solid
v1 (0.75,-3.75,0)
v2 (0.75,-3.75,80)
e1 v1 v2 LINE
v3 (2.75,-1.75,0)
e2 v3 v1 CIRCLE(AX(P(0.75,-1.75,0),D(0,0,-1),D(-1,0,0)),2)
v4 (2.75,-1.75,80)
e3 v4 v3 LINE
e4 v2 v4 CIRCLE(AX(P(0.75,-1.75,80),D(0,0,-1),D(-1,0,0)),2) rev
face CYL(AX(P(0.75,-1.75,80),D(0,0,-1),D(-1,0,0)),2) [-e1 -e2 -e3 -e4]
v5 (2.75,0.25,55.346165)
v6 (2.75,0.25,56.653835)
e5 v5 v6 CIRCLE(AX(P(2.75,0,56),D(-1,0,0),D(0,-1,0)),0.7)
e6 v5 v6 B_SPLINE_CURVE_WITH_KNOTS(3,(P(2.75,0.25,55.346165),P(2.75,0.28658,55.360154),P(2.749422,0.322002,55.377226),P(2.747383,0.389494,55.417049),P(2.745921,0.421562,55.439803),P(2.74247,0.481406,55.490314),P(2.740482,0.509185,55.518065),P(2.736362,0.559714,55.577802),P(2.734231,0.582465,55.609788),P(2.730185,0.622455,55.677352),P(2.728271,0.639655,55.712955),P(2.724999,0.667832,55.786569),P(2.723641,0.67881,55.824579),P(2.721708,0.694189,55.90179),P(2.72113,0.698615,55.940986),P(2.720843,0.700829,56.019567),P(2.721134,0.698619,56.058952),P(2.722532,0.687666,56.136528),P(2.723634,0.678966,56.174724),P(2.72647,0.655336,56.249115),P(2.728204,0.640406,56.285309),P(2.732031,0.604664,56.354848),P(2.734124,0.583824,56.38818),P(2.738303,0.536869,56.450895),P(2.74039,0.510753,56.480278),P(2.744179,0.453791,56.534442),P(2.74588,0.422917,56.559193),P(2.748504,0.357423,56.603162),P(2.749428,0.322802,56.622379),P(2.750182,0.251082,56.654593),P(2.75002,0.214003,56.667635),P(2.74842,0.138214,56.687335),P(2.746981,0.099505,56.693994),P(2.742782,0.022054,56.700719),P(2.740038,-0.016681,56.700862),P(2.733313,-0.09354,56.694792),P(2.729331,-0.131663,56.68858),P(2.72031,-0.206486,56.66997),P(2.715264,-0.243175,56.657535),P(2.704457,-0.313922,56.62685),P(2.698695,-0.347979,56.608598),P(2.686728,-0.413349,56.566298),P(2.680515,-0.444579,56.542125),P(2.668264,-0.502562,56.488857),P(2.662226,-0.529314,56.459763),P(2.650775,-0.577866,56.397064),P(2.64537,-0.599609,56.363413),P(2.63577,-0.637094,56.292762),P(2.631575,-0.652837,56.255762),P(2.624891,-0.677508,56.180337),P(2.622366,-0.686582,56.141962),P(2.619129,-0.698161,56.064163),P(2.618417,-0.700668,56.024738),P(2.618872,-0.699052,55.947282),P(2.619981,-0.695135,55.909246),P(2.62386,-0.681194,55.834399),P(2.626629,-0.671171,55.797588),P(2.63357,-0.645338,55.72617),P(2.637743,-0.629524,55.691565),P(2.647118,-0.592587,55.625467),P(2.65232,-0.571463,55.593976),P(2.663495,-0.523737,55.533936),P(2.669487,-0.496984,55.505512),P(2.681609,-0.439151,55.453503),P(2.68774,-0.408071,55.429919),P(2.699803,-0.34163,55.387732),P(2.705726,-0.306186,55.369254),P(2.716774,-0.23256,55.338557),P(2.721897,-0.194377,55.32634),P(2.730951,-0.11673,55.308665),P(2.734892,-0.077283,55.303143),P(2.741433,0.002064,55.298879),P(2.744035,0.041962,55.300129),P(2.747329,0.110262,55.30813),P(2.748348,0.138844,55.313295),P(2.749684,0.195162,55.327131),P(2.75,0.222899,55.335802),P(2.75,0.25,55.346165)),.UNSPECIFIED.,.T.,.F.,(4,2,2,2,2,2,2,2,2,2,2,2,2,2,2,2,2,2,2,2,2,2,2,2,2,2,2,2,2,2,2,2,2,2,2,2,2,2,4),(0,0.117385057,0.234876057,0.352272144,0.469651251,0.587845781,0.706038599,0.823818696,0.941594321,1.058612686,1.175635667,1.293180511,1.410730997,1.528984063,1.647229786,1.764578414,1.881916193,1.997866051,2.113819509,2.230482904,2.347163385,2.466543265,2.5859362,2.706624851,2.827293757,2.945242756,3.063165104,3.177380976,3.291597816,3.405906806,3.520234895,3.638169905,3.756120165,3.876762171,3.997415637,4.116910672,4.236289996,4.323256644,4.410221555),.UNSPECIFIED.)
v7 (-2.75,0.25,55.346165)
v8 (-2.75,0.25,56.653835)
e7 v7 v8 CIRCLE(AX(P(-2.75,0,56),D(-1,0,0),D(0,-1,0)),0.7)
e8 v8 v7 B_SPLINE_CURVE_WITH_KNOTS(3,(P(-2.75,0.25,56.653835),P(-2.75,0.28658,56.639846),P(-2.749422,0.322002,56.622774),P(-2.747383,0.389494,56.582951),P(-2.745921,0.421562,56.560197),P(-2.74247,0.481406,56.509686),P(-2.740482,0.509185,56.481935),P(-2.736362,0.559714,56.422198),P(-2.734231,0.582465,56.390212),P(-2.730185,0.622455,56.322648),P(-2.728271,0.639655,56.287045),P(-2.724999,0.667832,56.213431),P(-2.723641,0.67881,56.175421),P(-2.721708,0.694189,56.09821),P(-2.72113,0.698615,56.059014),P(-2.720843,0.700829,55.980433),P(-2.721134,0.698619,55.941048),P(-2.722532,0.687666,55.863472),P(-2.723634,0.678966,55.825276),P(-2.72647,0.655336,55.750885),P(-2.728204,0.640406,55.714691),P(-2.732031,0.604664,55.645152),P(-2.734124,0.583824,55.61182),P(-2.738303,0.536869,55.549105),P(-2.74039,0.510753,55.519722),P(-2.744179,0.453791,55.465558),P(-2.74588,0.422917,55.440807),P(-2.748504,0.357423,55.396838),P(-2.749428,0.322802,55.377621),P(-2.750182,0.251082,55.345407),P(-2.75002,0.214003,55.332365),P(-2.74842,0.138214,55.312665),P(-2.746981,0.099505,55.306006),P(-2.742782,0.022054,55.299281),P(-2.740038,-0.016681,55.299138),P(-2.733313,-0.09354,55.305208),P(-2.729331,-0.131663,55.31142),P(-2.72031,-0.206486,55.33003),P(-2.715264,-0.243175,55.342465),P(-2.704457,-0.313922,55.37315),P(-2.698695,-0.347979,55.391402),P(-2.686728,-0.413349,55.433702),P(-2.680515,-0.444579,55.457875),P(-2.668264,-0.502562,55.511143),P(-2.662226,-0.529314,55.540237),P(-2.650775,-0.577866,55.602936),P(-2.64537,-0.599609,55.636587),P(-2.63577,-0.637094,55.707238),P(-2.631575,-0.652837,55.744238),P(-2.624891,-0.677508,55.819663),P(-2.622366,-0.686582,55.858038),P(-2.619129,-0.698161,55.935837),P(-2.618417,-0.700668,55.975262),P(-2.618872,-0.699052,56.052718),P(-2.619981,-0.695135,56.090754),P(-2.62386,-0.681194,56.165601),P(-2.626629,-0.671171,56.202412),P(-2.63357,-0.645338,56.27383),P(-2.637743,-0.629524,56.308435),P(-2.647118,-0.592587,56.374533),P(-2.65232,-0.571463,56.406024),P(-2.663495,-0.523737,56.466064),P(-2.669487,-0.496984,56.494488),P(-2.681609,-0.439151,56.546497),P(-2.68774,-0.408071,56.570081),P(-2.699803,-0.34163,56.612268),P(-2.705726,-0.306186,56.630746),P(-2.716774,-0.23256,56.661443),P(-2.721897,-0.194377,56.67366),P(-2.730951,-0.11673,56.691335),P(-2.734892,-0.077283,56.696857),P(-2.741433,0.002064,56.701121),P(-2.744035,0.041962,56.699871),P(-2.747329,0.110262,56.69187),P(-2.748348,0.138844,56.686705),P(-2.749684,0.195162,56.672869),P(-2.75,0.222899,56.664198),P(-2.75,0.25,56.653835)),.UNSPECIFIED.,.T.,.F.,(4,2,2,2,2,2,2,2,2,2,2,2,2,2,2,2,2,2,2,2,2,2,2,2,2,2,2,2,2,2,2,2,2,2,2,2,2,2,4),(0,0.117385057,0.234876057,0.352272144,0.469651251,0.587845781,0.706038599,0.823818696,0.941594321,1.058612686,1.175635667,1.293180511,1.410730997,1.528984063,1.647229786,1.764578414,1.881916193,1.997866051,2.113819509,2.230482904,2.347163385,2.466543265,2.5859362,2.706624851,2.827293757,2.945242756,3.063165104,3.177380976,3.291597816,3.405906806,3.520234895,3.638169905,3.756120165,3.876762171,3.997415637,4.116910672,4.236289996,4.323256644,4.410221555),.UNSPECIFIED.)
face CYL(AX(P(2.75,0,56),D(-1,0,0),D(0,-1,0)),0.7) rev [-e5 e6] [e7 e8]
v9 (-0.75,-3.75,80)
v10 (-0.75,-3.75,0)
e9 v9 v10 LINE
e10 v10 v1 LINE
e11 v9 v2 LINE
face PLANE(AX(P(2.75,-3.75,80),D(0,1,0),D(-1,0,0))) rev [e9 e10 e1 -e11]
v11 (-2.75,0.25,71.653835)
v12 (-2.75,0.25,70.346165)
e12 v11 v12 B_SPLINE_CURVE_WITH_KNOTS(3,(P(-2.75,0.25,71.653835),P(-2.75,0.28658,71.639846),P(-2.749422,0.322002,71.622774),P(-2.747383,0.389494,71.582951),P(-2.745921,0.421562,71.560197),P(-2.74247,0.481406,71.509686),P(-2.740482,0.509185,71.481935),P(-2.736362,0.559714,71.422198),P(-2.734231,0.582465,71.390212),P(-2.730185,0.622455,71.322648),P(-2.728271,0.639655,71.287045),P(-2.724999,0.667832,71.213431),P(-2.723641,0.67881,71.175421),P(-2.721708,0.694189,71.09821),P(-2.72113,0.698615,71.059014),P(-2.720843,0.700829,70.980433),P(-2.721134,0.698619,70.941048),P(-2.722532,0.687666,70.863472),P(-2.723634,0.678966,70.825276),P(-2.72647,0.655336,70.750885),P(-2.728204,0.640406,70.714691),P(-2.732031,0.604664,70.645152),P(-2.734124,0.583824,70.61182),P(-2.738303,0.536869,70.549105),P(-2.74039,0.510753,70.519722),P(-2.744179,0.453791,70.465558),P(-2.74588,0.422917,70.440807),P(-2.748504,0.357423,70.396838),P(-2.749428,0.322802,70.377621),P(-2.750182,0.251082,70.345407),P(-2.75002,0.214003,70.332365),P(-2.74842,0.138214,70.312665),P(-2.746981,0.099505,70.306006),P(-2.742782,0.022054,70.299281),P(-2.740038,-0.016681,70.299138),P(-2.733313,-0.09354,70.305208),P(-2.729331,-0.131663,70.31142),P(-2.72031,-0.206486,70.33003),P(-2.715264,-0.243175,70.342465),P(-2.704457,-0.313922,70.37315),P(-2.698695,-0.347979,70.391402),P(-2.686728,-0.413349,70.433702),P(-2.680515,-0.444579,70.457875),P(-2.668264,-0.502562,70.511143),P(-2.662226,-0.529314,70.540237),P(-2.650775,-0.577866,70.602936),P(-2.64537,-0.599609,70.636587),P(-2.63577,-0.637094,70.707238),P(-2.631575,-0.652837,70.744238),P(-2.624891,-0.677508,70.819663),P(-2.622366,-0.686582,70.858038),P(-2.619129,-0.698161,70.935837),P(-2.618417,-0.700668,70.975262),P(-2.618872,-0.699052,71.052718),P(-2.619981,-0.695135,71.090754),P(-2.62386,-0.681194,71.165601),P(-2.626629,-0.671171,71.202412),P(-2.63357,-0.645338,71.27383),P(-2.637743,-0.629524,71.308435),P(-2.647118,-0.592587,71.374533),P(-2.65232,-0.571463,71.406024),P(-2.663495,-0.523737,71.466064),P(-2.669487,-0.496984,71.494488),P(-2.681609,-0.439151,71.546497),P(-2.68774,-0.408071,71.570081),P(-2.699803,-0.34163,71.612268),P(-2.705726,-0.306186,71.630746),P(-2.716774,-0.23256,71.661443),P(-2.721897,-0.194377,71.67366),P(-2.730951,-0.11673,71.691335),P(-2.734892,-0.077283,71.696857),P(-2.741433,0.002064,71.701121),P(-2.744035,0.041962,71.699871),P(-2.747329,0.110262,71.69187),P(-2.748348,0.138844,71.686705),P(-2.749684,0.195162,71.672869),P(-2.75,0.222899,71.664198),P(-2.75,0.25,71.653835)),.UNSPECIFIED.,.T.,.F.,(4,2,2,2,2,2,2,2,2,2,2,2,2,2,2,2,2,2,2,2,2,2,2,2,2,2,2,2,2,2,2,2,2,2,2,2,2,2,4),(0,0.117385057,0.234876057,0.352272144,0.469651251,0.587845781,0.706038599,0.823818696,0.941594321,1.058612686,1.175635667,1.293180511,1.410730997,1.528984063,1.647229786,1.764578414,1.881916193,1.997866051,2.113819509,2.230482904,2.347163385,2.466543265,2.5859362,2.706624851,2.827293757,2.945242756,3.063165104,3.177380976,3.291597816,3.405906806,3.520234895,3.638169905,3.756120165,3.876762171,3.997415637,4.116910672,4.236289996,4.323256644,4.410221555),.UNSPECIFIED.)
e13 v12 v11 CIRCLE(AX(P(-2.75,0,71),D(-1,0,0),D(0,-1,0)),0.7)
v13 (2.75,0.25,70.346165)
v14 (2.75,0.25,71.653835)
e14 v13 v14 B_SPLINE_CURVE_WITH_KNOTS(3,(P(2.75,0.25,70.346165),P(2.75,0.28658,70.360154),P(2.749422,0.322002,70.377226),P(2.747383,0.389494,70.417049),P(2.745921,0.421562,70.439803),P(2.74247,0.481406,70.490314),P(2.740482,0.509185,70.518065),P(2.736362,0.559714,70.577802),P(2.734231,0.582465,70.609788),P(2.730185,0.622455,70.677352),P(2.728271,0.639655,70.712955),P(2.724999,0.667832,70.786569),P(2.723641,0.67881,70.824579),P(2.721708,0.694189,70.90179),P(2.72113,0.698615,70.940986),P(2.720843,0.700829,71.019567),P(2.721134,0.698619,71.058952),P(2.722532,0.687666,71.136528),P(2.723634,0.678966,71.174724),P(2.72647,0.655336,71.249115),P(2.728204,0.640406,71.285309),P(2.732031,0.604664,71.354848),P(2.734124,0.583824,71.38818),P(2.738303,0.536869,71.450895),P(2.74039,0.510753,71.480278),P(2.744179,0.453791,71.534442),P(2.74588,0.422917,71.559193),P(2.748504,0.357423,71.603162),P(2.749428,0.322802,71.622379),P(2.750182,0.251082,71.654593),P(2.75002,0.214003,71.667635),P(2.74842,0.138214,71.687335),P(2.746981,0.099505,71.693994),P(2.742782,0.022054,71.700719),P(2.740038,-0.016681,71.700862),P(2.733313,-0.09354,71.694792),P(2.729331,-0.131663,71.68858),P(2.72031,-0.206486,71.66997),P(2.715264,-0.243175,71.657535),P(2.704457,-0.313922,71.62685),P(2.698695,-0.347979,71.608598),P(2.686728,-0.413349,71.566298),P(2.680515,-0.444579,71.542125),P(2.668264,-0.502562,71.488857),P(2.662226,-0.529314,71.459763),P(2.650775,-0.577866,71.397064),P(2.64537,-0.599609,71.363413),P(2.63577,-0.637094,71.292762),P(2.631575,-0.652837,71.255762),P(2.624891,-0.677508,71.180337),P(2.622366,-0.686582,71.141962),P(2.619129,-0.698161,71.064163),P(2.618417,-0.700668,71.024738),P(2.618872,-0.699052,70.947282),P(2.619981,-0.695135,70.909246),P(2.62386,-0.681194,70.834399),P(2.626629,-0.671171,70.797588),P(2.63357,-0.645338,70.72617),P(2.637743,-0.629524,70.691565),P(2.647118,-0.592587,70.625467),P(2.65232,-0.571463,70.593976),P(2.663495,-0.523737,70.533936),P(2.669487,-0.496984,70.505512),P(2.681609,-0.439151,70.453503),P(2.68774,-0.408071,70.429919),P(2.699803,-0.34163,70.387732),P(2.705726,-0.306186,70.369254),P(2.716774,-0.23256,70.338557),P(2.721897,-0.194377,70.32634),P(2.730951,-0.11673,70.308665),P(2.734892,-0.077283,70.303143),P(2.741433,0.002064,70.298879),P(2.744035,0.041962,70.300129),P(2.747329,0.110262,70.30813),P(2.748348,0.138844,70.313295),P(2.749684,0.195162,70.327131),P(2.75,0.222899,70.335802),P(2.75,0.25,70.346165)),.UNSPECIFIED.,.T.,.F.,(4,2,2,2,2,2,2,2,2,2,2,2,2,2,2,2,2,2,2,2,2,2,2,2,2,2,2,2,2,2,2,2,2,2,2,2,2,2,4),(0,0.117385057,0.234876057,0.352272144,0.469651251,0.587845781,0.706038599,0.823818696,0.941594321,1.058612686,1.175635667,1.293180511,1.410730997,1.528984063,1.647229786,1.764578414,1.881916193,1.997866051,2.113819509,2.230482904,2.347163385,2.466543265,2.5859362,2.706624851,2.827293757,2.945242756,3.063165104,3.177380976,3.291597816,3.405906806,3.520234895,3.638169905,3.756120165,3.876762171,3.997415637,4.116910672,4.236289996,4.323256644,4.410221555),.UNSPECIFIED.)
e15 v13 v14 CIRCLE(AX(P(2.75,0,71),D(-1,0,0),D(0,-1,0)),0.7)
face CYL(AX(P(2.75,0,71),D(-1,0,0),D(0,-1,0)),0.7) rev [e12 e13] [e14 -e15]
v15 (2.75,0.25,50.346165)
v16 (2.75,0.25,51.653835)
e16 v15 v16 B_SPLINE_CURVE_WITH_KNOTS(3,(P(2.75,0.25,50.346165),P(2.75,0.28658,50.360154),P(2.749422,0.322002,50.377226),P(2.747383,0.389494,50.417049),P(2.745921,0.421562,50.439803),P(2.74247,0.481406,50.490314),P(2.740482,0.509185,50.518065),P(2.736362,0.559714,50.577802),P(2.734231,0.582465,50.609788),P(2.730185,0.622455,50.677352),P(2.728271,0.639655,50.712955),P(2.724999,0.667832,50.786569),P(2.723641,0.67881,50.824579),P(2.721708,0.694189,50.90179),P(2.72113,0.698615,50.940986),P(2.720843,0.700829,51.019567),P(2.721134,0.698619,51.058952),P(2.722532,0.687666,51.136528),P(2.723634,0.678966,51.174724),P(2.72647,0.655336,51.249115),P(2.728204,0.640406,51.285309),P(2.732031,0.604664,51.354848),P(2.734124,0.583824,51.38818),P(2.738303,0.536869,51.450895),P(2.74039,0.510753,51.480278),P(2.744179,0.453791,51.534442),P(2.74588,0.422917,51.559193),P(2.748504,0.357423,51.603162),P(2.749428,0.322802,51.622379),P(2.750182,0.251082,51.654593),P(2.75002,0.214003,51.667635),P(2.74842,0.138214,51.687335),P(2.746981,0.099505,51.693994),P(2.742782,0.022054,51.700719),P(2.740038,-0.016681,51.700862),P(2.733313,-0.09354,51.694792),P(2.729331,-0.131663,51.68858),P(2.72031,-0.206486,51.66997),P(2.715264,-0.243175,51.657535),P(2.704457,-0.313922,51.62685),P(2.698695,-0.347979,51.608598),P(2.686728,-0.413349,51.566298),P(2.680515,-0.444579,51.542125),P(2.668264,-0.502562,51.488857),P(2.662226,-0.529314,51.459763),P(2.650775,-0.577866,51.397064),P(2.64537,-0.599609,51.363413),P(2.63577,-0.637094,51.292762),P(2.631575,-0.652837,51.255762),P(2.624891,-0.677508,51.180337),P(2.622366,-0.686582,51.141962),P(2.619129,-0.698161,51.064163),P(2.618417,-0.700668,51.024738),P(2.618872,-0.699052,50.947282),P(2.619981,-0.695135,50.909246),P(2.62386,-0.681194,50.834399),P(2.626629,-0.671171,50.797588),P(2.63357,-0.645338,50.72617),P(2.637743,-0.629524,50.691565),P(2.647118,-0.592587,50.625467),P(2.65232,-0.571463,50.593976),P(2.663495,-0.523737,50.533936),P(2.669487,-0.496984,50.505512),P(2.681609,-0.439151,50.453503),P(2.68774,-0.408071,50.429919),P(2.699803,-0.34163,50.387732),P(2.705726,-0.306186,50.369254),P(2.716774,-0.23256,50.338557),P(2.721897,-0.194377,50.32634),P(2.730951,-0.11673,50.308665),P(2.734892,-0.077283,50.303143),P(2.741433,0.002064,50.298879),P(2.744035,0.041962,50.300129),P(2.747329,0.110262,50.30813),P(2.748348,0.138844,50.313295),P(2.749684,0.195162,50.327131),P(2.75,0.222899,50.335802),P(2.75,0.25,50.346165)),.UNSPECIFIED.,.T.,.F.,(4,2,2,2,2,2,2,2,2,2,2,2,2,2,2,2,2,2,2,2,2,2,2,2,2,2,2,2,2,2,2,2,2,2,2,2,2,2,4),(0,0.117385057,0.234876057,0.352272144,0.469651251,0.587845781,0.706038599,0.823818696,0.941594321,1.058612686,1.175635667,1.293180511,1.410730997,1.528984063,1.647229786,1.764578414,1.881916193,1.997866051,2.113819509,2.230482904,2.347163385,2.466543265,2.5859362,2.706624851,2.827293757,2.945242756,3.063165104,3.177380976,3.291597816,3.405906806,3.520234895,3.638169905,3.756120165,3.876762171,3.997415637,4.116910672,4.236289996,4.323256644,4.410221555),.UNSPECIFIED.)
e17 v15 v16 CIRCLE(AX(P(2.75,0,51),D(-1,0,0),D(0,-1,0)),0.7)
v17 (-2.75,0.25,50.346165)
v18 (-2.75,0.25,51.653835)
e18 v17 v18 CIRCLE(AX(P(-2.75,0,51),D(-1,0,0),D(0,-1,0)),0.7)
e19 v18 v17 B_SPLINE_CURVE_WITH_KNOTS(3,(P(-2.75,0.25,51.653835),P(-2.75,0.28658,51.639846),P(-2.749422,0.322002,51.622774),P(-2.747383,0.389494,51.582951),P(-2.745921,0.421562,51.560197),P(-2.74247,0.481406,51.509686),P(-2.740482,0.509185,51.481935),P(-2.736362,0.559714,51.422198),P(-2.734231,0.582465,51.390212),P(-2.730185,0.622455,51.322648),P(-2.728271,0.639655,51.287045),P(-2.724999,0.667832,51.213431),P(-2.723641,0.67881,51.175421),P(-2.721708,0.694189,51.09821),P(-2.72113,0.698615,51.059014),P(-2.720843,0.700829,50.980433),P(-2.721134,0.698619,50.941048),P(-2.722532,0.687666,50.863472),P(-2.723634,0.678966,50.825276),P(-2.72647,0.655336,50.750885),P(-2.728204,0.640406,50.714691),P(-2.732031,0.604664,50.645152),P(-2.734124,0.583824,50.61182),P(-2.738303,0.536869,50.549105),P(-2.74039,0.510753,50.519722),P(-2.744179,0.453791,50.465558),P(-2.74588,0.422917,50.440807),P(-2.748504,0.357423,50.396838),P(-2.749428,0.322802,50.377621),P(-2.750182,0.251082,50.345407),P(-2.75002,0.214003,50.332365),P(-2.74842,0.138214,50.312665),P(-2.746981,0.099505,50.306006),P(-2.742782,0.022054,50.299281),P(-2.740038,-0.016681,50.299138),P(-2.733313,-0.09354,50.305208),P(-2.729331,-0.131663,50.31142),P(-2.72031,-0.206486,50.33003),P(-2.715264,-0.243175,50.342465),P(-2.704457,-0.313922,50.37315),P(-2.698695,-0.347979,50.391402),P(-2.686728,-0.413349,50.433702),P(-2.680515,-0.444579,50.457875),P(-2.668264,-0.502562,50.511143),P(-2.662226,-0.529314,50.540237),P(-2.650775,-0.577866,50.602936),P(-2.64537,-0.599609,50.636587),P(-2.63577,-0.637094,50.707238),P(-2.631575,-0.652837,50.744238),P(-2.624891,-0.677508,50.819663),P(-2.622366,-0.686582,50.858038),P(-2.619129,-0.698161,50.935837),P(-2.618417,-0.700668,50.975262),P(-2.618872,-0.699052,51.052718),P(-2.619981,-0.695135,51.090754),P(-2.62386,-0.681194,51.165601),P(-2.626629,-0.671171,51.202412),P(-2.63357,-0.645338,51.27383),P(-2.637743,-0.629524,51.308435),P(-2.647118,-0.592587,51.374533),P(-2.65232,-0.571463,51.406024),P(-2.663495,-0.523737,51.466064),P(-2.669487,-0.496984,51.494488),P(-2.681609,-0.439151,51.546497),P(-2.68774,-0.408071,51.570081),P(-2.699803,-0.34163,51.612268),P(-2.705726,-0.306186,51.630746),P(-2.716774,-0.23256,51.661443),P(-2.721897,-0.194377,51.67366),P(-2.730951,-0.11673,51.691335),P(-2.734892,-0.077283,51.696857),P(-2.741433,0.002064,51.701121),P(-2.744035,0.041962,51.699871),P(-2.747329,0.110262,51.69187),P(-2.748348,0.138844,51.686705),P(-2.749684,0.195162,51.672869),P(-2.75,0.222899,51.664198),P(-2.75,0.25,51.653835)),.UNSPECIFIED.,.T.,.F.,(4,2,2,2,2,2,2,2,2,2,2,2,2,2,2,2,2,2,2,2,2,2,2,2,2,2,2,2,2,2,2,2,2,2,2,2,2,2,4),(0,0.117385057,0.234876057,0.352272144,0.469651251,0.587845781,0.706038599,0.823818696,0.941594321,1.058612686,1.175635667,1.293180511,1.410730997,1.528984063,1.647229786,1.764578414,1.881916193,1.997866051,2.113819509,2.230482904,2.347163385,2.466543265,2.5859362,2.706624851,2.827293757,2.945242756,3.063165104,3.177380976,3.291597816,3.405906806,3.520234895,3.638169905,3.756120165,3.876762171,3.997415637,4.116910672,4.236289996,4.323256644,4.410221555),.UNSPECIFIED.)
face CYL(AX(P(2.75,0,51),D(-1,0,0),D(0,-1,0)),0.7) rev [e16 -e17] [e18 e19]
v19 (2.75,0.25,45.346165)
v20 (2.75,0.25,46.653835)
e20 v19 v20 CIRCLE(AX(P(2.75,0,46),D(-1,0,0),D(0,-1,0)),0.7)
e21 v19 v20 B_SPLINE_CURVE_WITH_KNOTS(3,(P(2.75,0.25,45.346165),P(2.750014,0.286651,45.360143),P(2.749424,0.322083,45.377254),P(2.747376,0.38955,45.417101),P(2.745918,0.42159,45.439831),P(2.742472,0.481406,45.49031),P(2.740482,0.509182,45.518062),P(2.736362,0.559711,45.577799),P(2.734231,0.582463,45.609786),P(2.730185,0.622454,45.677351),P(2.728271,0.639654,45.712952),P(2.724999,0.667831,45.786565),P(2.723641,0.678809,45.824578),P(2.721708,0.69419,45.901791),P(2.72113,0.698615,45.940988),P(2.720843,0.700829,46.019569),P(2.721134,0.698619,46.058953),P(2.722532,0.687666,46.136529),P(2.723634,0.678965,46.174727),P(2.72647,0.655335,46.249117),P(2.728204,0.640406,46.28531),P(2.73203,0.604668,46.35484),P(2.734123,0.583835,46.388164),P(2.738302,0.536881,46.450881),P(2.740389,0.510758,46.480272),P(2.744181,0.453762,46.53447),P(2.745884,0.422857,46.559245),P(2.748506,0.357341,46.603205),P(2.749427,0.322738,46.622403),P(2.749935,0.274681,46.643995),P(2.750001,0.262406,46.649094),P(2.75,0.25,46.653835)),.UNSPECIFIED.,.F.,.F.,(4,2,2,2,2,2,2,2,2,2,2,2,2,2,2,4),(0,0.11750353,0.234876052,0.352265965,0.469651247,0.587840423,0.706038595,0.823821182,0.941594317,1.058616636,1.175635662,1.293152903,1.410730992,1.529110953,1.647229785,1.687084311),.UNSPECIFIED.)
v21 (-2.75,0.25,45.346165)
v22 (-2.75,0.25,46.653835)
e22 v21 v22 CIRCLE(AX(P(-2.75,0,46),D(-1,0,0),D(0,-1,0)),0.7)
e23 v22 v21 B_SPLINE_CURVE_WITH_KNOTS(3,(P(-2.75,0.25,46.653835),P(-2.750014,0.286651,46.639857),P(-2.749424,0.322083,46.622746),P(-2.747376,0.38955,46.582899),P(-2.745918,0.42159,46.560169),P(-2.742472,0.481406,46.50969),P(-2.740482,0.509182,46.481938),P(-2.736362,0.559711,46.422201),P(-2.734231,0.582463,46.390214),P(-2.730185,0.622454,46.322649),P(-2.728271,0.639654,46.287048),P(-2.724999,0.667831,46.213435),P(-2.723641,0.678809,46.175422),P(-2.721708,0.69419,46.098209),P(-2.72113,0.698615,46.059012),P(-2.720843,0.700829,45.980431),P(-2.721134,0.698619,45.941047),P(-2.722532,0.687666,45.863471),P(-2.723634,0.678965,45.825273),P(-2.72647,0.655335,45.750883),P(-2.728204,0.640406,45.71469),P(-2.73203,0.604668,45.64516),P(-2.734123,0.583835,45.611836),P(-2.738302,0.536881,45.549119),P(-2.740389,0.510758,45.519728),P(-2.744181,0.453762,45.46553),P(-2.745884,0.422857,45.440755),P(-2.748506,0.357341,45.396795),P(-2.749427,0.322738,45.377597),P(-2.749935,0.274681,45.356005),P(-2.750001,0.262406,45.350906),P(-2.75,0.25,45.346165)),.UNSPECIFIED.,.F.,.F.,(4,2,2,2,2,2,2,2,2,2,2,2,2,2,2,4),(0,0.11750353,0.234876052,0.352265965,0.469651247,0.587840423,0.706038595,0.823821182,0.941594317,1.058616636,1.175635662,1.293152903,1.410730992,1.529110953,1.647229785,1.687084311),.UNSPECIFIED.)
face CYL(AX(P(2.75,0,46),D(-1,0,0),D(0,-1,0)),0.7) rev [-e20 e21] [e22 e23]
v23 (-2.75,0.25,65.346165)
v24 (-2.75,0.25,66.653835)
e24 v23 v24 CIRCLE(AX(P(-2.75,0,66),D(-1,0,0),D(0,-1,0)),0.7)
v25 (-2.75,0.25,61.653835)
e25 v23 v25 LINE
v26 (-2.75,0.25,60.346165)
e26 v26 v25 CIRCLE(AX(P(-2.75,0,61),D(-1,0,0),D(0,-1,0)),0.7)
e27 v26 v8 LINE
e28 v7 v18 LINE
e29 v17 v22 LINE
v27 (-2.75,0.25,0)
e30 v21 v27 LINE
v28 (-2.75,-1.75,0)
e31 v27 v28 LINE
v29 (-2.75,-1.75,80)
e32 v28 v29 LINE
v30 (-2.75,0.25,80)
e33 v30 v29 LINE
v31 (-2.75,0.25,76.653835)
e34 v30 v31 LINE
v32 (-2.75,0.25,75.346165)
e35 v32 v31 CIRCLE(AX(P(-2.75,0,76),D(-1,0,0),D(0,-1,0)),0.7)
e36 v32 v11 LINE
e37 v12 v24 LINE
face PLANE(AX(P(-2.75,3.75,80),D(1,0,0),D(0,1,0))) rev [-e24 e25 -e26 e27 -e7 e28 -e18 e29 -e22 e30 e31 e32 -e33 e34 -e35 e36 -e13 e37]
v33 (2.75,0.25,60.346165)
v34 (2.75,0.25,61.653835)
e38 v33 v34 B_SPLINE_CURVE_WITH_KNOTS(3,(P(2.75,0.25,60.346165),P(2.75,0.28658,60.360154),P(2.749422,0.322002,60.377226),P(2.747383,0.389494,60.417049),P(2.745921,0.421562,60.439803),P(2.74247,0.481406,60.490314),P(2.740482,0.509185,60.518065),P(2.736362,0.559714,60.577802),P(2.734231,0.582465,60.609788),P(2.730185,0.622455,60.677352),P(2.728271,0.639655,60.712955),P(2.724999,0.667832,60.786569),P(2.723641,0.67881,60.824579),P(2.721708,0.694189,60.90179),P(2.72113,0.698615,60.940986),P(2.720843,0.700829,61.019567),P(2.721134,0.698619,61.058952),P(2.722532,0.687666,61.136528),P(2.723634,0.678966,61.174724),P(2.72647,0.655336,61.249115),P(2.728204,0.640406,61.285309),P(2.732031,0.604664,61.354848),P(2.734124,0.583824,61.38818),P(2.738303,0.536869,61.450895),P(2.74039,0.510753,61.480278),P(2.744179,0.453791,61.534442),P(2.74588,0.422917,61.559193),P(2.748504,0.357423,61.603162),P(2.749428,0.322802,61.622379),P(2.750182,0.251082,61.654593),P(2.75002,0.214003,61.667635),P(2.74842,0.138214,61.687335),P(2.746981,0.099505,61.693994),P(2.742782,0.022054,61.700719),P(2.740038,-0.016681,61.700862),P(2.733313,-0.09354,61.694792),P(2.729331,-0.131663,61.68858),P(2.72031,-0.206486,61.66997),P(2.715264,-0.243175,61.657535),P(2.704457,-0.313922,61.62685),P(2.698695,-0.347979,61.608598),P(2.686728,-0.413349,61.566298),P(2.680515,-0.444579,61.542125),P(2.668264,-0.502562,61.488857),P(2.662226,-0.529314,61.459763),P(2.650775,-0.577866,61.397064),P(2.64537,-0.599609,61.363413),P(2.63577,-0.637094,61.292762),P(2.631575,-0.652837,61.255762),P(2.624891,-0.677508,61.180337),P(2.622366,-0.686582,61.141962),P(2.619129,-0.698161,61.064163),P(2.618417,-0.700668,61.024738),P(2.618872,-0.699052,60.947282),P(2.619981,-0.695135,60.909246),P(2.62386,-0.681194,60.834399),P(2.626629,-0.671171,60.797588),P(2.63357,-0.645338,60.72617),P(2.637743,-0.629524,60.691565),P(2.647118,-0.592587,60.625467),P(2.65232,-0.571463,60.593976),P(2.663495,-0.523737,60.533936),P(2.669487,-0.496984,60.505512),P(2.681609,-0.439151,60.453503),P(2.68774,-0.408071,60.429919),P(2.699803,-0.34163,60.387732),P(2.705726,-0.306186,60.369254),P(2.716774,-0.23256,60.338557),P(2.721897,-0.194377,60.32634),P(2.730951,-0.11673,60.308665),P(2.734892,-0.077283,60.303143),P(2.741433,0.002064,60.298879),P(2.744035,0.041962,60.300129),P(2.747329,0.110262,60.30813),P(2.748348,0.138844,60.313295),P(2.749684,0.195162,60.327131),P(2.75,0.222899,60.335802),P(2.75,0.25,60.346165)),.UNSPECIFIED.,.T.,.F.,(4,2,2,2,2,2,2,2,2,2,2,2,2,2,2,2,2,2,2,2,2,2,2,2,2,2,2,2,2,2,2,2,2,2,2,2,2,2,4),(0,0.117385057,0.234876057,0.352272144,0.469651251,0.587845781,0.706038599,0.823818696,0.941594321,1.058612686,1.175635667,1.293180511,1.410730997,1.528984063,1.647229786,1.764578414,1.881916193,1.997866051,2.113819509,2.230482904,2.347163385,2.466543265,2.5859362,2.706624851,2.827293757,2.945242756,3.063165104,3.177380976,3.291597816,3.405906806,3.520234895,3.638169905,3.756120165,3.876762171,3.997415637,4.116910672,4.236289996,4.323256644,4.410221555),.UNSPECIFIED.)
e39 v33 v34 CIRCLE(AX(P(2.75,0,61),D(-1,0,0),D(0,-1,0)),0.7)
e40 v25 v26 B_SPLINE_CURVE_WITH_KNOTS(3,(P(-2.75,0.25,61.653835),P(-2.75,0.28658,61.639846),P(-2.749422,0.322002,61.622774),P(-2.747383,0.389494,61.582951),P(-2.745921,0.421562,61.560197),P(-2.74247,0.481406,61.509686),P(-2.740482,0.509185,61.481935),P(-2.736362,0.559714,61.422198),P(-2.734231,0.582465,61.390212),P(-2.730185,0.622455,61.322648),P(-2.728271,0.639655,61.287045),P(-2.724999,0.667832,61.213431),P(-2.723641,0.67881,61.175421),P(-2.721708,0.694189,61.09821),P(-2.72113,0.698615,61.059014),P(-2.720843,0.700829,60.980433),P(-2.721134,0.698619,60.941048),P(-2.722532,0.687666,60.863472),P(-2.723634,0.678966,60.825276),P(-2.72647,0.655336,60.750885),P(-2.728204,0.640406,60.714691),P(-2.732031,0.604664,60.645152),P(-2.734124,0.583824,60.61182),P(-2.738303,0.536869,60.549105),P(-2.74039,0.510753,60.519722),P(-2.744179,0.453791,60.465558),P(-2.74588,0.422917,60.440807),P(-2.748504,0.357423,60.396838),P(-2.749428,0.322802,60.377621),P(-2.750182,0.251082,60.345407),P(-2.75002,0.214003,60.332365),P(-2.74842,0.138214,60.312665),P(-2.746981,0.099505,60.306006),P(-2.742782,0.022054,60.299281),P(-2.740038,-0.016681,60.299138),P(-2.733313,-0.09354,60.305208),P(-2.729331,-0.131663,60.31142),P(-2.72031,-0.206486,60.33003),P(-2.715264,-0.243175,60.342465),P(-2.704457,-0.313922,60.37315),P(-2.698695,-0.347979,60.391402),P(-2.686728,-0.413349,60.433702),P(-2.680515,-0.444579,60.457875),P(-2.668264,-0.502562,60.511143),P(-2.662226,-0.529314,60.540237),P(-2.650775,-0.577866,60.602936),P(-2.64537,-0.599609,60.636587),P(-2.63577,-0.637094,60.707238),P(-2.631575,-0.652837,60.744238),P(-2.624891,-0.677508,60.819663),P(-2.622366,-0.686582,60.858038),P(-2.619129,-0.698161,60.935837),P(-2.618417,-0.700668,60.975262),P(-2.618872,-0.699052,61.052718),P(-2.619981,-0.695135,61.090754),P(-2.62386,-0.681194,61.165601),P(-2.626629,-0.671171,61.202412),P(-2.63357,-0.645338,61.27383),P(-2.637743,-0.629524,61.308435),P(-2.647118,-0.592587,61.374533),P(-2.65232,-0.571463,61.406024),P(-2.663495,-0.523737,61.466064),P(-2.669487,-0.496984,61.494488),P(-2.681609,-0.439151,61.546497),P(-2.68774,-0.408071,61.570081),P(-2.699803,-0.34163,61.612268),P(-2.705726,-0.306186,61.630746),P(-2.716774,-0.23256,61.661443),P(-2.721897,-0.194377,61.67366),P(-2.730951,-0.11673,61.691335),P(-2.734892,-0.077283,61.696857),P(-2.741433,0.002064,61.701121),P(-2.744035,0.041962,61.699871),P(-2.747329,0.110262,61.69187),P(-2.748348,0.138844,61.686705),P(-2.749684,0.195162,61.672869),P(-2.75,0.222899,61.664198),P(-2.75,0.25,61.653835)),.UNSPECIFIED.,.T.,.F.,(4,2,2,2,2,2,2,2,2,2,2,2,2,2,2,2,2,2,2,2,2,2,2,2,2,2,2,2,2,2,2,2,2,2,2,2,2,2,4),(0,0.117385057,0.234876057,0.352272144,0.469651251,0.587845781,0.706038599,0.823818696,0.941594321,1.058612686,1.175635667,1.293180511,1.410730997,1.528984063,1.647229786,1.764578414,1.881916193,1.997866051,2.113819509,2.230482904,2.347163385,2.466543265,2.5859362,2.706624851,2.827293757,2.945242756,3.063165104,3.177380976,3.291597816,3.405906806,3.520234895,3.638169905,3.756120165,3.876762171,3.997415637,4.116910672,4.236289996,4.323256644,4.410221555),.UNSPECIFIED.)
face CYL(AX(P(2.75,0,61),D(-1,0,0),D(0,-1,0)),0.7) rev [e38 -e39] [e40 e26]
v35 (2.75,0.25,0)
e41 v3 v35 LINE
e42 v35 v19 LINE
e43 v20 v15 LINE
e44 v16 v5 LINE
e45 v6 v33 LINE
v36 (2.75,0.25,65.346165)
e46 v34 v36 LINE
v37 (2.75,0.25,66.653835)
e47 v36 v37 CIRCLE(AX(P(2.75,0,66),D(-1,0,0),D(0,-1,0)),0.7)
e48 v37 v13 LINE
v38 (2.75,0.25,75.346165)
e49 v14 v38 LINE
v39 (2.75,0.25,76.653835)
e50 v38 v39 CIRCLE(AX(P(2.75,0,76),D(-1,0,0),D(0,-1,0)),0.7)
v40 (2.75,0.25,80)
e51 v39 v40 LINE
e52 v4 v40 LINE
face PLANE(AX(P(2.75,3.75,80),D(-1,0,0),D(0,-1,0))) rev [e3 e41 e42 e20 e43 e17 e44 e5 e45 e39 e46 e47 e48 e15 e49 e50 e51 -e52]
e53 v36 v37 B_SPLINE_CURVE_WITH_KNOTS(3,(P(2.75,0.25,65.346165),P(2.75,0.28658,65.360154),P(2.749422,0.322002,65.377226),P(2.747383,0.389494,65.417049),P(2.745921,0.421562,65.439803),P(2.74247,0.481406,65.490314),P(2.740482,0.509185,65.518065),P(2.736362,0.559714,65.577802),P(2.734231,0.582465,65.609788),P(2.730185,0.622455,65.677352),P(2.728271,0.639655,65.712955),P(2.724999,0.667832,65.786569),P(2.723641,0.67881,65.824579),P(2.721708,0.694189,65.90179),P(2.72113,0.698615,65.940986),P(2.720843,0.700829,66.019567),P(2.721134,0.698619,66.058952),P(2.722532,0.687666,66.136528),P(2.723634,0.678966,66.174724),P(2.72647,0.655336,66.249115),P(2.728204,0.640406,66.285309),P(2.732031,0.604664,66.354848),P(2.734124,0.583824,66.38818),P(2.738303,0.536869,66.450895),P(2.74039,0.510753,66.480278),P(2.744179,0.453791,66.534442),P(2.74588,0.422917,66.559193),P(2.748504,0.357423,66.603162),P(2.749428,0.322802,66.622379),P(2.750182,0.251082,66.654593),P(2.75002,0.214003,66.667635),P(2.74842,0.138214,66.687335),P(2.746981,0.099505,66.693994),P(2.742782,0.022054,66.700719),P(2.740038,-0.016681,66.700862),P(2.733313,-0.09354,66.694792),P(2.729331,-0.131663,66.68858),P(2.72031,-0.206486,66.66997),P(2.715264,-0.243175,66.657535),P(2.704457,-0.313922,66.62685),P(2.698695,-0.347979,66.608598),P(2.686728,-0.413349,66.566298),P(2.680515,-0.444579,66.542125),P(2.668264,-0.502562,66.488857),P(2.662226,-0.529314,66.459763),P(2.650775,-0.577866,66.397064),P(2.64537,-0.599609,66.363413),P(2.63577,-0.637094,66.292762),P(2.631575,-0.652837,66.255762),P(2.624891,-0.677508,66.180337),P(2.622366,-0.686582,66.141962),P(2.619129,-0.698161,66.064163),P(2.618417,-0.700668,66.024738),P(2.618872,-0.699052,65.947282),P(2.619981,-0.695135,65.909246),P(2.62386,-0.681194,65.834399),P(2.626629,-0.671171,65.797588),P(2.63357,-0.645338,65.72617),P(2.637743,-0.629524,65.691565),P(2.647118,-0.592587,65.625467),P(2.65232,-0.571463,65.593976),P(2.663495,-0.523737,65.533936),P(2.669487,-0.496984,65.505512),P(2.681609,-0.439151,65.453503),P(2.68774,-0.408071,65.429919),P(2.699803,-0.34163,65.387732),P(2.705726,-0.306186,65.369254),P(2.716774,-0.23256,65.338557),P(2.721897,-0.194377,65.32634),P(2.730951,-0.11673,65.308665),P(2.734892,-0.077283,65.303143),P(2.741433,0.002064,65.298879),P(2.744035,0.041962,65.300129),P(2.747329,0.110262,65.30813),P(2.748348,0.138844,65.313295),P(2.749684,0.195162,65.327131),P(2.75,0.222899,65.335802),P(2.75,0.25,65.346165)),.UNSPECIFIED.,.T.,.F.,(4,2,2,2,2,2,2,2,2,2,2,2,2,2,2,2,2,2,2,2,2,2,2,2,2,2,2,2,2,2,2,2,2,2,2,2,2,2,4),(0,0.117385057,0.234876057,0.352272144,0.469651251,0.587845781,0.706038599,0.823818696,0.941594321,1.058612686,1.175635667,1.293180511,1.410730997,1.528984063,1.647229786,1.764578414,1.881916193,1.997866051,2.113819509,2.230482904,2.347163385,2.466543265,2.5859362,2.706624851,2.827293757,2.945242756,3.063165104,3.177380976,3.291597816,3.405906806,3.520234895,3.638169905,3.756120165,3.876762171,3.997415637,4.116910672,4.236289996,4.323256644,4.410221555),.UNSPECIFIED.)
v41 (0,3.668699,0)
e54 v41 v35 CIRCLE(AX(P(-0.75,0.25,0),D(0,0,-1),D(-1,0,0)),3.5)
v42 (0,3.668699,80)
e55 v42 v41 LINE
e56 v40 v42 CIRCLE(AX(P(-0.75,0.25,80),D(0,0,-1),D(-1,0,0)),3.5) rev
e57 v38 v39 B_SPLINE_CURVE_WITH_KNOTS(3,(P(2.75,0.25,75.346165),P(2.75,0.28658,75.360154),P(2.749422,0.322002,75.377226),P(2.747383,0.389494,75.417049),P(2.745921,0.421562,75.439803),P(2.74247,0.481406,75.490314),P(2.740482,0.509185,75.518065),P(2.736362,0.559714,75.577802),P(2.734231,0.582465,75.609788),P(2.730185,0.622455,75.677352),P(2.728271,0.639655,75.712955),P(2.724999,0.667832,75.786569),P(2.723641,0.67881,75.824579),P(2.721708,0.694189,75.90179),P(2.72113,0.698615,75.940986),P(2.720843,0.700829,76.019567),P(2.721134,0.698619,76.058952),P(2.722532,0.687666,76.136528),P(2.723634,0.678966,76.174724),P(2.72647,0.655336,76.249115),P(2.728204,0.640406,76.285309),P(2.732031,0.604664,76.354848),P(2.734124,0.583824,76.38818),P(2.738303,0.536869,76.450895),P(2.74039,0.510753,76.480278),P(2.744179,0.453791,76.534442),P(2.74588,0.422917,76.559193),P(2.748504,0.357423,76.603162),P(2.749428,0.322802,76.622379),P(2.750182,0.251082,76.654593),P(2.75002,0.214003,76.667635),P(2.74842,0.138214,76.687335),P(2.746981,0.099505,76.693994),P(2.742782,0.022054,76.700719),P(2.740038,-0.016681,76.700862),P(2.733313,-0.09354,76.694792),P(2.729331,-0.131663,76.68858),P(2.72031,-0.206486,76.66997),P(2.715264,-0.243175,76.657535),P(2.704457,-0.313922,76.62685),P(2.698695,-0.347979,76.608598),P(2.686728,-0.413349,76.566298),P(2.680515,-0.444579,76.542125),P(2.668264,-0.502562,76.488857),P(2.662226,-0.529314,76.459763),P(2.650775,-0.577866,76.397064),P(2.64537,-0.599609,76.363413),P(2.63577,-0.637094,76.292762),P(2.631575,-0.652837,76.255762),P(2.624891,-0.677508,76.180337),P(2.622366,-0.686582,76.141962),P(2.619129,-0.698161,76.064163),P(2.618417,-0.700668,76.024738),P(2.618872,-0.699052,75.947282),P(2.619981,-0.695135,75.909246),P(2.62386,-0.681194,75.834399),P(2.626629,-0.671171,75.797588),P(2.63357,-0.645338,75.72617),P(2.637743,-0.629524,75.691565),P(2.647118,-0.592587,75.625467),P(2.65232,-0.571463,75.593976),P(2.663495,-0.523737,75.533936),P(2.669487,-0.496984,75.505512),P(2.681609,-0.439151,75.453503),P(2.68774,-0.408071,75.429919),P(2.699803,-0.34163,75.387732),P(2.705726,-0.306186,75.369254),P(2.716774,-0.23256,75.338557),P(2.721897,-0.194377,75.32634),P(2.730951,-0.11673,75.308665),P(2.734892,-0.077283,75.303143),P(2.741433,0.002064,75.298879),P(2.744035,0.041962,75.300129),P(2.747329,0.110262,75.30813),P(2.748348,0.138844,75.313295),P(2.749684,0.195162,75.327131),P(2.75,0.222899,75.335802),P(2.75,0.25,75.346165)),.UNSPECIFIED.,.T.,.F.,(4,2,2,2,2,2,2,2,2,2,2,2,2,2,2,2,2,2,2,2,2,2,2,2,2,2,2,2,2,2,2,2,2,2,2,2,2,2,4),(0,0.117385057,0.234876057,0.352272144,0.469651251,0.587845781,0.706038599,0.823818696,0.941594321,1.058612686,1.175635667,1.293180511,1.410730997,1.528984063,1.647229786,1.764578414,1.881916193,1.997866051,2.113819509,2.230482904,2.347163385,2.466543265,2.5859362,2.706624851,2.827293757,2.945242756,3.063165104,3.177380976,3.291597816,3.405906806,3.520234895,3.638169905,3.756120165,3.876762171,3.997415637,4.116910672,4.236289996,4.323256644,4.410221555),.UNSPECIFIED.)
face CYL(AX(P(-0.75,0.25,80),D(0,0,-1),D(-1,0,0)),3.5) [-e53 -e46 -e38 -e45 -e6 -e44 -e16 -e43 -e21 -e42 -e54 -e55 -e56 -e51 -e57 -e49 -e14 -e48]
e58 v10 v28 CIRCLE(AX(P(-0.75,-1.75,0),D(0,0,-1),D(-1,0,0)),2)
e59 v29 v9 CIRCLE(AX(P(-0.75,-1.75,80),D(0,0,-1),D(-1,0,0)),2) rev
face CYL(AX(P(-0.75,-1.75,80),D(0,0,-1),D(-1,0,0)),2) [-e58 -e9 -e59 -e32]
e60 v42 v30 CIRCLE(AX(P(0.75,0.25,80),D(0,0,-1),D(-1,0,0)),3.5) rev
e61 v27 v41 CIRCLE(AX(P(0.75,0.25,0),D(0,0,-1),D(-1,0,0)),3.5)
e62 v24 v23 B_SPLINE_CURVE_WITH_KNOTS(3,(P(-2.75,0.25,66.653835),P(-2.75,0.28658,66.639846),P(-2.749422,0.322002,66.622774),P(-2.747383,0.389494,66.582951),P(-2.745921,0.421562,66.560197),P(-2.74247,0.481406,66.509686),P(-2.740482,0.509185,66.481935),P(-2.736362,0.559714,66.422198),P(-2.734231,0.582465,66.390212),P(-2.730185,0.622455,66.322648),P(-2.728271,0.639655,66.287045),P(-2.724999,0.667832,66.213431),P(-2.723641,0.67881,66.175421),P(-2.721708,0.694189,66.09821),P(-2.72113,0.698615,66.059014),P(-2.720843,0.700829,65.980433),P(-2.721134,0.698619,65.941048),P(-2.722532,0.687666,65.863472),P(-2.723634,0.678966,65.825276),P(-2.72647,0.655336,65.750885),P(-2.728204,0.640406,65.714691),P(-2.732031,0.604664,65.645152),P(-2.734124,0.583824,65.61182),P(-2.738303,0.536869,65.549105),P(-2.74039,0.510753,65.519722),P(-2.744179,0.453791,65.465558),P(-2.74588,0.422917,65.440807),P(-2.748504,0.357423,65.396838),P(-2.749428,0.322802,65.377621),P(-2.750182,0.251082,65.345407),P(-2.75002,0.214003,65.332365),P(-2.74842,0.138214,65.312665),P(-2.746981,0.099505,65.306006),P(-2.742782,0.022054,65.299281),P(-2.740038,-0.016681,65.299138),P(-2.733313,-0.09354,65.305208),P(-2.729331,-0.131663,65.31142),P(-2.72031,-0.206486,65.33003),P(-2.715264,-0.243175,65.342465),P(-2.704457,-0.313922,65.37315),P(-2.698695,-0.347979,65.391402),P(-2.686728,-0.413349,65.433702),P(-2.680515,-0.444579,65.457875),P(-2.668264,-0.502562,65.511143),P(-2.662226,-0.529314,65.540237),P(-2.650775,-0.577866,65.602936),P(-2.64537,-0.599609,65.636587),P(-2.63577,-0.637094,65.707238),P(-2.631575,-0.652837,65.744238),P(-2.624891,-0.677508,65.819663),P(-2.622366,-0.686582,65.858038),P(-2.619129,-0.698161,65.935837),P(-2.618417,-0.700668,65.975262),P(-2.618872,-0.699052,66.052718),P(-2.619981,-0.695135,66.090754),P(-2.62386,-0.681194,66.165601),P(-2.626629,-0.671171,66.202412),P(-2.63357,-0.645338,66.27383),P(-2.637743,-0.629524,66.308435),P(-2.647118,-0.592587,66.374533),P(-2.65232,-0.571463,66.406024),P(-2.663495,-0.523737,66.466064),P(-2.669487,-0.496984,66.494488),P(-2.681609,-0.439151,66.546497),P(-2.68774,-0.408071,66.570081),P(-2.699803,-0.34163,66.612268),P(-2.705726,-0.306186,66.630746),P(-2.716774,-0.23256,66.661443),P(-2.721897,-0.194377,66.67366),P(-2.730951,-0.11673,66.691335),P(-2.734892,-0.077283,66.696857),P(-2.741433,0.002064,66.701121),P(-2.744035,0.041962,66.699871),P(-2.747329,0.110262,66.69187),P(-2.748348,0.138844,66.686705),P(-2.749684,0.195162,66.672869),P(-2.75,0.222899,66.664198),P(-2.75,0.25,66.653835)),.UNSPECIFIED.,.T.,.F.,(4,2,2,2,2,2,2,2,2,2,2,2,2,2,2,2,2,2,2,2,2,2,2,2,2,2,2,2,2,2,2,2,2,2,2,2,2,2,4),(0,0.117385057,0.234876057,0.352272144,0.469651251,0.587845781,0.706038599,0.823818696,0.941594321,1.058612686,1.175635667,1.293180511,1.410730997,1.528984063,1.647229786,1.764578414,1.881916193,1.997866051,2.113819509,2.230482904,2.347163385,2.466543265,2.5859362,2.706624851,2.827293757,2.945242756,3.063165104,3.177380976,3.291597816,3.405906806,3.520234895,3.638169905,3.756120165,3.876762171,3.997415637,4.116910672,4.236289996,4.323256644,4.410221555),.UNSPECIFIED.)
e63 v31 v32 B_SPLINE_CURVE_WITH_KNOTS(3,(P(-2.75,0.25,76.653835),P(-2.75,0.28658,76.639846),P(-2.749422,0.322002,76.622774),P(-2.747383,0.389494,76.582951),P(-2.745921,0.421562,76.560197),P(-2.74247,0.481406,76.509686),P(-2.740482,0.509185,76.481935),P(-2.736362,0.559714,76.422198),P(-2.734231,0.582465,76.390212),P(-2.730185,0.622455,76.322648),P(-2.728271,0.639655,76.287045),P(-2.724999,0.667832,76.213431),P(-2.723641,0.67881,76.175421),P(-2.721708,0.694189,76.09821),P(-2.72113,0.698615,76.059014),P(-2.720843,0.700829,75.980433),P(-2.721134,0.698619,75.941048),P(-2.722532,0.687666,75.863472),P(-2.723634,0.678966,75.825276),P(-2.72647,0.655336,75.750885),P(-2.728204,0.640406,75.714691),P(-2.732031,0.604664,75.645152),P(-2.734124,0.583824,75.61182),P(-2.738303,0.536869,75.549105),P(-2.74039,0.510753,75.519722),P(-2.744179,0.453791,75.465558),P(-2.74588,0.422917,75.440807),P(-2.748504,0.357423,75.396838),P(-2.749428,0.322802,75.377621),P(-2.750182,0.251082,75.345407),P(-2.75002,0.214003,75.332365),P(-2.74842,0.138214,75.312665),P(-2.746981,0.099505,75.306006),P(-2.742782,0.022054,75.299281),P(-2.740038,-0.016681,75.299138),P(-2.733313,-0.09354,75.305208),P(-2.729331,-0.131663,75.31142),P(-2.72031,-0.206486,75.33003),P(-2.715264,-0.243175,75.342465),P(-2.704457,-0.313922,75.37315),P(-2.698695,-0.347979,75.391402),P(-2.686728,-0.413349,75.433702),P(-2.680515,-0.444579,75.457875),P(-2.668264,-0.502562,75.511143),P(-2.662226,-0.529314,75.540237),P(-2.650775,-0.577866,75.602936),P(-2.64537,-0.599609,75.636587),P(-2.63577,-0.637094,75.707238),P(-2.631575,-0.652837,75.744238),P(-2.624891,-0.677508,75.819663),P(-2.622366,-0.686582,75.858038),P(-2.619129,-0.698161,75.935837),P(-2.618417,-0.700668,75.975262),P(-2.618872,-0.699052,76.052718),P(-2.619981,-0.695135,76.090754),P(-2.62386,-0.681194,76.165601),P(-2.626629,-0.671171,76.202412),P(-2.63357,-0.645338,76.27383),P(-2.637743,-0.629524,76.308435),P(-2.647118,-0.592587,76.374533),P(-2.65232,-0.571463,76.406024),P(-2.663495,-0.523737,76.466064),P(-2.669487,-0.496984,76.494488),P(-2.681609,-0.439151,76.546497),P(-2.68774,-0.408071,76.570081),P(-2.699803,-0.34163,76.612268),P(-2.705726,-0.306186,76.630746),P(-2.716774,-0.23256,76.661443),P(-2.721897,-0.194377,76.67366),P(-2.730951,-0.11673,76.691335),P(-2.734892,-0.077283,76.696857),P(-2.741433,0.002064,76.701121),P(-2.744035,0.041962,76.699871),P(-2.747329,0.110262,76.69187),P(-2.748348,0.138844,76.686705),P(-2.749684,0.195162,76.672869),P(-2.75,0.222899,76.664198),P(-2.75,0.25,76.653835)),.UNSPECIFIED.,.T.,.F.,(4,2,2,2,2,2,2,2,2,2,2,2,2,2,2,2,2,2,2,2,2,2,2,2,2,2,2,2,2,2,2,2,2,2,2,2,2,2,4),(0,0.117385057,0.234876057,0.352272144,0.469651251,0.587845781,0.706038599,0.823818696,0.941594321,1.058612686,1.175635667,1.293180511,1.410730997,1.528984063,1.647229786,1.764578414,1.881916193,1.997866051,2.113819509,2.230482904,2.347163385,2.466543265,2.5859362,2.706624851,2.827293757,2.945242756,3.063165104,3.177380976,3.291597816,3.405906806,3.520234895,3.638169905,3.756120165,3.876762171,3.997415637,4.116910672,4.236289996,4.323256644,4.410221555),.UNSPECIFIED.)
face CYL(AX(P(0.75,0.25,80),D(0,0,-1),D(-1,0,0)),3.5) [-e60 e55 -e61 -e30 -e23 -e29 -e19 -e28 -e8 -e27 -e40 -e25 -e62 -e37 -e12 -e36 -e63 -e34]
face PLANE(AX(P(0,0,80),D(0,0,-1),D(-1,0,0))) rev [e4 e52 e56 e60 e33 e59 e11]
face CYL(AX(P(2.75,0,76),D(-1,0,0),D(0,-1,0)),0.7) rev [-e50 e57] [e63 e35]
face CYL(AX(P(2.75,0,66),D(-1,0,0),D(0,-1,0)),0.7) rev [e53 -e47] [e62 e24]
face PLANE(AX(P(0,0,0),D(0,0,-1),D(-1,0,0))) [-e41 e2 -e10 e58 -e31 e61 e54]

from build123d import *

# Parameters (mm, degrees)
ESQUISSE1_W             = 5.5
ESQUISSE1_H             = 7.5
BOSS_EXTRU_1_DEPTH      = 80
CONG_1_R                = 3.5
CONG_2_R                = 2
ESQUISSE2_R             = 0.7
ENL_V_MAT_EXTRU_1_DEPTH = 81.276475384


with BuildPart() as part:
    # Esquisse1 → Boss.-Extru.1 (new body)
    with BuildSketch(Plane.XY):
        Rectangle(ESQUISSE1_W, ESQUISSE1_H)
    extrude(amount=BOSS_EXTRU_1_DEPTH)

    # Congé1
    # the kernel refuses this fillet: 3.5 mm, written as the material it takes off along each edge
    with BuildSketch(Plane(origin=(-2.75, 3.75, -8.75), x_dir=(1, 0, 0), z_dir=(0, 0, 1))) as cong_1_piece_1:
        with BuildLine():
            CenterArc((CONG_1_R, -CONG_1_R), CONG_1_R, 90, 90)
            Line((0, -CONG_1_R), (0, 0))
            Line((0, 0), (CONG_1_R, 0))
        make_face()
    extrude(amount=97.5, mode=Mode.SUBTRACT)
    with BuildSketch(Plane(origin=(2.75, 3.75, -8.75), x_dir=(-1, 0, 0), z_dir=(0, 0, 1))) as cong_1_piece_2:
        with BuildLine():
            CenterArc((CONG_1_R, CONG_1_R), CONG_1_R, 180, 90)
            Line((0, CONG_1_R), (0, 0))
            Line((0, 0), (CONG_1_R, 0))
        make_face()
    extrude(amount=97.5, mode=Mode.SUBTRACT)

    # Congé2
    cong_2_edges = [part.edges().sort_by_distance(p)[0] for p in [
        (2.75, -3.75, 40),
        (-2.75, -3.75, 40),
    ]]
    fillet(cong_2_edges, radius=CONG_2_R)

    # Esquisse2 → Enlèv. mat.-Extru.1 (cut, through all)
    with BuildSketch(Plane.ZY.offset(2.75)):
        with Locations(Location((46, 0, 0), (0, 0, 159.075167572))):
            Circle(ESQUISSE2_R)
        with Locations(Location((51, 0, 0), (0, 0, 159.075167572))):
            Circle(ESQUISSE2_R)
        with Locations(Location((56, 0, 0), (0, 0, 159.075167572))):
            Circle(ESQUISSE2_R)
        with Locations(Location((61, 0, 0), (0, 0, 159.075167572))):
            Circle(ESQUISSE2_R)
        with Locations(Location((66, 0, 0), (0, 0, 159.075167572))):
            Circle(ESQUISSE2_R)
        with Locations(Location((71, 0, 0), (0, 0, 159.075167572))):
            Circle(ESQUISSE2_R)
        with Locations(Location((76, 0, 0), (0, 0, 159.075167572))):
            Circle(ESQUISSE2_R)
    extrude(amount=-ENL_V_MAT_EXTRU_1_DEPTH, mode=Mode.SUBTRACT)


solid = part.part
